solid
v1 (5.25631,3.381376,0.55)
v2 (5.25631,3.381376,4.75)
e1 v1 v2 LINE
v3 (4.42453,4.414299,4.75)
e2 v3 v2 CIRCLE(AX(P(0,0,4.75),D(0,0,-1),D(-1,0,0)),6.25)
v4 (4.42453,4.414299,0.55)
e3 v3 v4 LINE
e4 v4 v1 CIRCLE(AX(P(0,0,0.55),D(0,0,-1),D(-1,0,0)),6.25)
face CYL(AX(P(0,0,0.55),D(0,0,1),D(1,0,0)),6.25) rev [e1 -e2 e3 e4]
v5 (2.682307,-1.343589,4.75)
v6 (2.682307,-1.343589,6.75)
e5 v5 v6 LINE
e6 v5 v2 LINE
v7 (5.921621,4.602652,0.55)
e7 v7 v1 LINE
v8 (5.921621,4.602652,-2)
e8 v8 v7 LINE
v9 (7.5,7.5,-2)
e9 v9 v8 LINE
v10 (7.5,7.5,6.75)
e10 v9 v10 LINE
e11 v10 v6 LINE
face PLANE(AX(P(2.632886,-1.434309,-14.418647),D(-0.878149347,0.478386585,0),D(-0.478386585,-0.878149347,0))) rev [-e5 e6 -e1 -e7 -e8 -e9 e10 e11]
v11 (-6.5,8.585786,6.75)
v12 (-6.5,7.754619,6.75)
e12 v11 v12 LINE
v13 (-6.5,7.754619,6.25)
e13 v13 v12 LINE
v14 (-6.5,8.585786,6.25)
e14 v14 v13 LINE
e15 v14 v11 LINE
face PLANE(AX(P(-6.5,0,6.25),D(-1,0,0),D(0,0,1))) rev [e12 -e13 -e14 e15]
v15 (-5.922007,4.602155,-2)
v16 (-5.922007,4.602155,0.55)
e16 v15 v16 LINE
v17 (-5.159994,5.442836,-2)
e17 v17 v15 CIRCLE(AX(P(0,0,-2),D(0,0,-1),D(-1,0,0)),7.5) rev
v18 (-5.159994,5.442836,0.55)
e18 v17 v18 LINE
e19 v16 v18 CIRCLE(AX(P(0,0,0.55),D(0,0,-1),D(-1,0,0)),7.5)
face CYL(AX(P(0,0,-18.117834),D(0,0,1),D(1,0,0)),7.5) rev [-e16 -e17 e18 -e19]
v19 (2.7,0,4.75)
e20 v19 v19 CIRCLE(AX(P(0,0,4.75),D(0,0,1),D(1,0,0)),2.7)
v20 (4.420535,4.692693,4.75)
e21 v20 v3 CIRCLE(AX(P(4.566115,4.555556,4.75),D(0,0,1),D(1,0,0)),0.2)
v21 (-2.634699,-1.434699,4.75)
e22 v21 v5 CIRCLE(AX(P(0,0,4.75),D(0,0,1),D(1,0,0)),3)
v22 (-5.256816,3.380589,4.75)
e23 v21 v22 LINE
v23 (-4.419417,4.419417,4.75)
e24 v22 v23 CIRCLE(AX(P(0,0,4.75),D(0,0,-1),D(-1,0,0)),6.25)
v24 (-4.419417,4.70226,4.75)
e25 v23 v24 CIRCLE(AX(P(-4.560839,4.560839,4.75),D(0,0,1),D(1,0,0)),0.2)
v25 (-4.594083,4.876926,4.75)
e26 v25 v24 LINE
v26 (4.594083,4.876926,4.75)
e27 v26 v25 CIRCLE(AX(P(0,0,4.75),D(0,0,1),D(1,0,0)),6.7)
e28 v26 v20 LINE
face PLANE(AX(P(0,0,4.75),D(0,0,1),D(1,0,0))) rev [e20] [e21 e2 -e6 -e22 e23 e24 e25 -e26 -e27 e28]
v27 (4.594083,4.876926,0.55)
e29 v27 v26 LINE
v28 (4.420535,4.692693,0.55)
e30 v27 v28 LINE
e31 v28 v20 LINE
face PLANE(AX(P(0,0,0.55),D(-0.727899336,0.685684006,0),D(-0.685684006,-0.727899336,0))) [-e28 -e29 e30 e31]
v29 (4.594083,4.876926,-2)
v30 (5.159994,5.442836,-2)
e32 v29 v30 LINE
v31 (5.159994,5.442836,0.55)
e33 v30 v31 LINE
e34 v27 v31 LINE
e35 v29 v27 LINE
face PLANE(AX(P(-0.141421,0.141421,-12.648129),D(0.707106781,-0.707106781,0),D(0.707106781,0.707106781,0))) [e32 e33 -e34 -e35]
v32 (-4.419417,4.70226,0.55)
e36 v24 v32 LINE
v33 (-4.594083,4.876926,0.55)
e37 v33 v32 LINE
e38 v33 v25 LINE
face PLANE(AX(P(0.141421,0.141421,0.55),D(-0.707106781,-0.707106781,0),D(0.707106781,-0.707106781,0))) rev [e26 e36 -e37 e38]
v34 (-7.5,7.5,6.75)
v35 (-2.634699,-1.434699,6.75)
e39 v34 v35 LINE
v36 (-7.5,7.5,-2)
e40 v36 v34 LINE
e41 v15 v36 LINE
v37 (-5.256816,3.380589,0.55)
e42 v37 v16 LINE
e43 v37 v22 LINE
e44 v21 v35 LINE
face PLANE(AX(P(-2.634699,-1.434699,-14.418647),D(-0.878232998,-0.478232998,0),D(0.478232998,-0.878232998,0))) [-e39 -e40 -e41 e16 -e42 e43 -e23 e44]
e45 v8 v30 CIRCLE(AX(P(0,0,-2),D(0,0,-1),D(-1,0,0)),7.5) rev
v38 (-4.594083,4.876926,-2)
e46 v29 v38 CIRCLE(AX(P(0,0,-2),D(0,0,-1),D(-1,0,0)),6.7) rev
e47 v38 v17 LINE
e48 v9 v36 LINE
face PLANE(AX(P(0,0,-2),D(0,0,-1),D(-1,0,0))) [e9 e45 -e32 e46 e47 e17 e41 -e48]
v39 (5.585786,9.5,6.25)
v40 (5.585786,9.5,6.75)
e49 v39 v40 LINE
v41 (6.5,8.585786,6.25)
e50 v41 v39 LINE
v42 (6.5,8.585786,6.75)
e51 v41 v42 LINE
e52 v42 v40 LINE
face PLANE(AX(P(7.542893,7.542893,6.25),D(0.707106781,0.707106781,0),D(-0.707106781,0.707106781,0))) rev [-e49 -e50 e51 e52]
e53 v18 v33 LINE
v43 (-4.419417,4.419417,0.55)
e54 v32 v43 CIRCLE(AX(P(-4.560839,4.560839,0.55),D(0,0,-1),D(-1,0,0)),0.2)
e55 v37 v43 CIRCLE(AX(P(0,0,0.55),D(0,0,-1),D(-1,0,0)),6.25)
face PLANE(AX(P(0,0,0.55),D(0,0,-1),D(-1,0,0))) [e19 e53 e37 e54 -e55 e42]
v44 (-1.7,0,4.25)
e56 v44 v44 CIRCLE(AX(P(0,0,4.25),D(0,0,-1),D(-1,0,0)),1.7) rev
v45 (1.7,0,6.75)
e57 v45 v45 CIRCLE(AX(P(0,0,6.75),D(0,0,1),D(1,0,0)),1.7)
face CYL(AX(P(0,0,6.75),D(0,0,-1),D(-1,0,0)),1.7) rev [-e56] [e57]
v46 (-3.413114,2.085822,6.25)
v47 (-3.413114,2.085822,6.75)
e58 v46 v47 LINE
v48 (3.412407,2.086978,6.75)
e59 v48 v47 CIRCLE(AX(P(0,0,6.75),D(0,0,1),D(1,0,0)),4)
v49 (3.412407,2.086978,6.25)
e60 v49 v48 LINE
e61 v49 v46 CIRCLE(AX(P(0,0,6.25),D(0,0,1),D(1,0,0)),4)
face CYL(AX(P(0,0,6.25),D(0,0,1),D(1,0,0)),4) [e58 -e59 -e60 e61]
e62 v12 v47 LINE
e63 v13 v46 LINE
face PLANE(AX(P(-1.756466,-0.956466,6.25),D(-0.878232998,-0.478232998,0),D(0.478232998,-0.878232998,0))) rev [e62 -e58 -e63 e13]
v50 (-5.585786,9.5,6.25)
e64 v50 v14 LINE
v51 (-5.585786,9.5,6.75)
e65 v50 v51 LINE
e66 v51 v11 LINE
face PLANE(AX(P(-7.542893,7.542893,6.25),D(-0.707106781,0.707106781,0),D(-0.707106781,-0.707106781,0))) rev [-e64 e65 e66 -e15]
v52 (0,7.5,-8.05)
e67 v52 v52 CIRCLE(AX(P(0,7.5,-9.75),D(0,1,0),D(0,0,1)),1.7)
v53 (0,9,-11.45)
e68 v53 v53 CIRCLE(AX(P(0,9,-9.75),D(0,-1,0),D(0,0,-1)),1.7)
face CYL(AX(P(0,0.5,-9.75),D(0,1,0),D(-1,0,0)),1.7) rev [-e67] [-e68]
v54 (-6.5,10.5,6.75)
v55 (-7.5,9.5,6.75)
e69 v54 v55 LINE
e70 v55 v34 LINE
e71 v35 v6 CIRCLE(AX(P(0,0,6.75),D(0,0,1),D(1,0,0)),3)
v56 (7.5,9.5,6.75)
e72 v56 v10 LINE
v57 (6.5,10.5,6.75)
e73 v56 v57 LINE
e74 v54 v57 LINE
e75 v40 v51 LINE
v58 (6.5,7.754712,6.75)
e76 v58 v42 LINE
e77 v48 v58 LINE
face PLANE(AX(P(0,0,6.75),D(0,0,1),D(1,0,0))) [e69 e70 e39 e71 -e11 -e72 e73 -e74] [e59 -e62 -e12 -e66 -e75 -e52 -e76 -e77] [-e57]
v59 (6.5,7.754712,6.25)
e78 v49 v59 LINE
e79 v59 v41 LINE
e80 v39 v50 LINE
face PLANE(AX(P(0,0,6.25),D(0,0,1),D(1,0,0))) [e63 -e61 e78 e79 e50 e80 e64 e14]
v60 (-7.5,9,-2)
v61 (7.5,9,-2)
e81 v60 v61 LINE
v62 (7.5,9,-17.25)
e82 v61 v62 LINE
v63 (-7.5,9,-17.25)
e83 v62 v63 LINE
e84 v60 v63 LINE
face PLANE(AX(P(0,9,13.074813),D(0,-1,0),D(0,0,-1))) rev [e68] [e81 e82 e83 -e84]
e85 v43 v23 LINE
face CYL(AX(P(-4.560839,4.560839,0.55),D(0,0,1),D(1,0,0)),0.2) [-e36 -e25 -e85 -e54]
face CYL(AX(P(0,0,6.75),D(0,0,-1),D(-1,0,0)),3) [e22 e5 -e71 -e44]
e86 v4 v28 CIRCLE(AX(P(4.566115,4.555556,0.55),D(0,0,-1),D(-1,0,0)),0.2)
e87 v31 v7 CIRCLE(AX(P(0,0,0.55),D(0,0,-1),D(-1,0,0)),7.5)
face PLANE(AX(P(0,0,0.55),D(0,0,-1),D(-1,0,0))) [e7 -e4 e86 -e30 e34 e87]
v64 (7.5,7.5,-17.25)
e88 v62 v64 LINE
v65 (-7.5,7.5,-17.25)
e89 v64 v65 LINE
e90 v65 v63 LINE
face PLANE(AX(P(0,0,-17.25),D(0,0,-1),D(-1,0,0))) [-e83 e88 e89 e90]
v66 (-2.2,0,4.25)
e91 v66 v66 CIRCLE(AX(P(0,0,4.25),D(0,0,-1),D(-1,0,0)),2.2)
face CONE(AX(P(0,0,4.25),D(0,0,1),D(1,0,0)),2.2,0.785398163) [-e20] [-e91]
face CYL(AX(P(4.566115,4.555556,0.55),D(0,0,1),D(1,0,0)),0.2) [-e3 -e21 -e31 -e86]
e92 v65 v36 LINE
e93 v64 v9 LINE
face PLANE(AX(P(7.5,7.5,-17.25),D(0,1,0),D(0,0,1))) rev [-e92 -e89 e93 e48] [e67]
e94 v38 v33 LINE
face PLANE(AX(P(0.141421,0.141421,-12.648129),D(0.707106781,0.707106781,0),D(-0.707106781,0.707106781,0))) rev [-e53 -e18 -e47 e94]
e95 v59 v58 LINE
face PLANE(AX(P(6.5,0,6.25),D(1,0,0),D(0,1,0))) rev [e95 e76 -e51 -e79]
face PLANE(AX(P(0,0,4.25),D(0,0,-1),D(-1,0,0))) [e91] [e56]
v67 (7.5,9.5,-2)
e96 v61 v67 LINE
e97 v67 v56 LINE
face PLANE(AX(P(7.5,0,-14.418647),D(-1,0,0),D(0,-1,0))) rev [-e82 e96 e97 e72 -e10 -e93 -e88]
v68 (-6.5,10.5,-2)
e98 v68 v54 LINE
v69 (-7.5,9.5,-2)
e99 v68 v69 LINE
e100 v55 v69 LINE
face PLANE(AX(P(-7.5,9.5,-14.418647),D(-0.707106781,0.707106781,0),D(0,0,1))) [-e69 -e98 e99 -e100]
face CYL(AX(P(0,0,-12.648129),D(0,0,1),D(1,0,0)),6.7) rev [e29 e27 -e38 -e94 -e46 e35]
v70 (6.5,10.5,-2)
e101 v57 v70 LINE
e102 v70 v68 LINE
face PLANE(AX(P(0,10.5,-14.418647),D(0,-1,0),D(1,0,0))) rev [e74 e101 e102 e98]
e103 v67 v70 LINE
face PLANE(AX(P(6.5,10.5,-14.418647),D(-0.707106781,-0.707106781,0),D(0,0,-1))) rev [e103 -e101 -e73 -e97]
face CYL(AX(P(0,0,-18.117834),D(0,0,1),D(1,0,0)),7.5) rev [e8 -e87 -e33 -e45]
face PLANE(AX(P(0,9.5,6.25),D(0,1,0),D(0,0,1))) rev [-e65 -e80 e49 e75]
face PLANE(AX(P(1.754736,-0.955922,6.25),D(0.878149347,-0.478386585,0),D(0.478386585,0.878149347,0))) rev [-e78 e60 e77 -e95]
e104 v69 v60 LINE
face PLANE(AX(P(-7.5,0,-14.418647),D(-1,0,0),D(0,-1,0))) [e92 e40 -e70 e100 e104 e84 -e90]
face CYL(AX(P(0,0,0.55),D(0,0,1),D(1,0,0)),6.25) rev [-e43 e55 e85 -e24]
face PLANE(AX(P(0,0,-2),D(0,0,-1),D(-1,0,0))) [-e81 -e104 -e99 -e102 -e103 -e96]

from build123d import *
from build123d.topology import SkipClean

# Parameters (mm, degrees)
BOSS_EXTRUDE1_DEPTH    = 2
BOSS_EXTRUDE2_START    = 4.75
BOSS_EXTRUDE2_DEPTH    = 4.75
BOSS_EXTRUDE3_START    = 2
SKETCH3_R              = 3
SKETCH3_R_2            = 1.7
BOSS_EXTRUDE3_DEPTH    = 2
SKETCH4_R              = 2.2
SKETCH4_R_2            = 1.7
BOSS_EXTRUDE4_DEPTH    = 0.5
CHAMFER1_SIZE          = 0.5
SKETCH5_W              = 7.5
SKETCH5_H              = 3
BOSS_EXTRUDE5_DEPTH    = 2
BOSS_EXTRUDE6_DEPTH    = 4.2
BOSS_EXTRUDE8_DEPTH    = 6.75
SKETCH10_W             = 15
SKETCH10_H             = 3
BOSS_EXTRUDE9_DEPTH    = 15.25
SKETCH11_R             = 1.65
CUT_EXTRUDE1_DEPTH     = 22.542109925
FILLET1_R              = 0.2
BOSS_EXTRUDE12_REACH   = 29.249
SKETCH16_W             = 15
SKETCH16_H             = 1.5
CUT_EXTRUDE3_DEPTH     = 0.5
CUT_EXTRUDE4_START     = -15.25
CUT_EXTRUDE4_OUTLINE_W = 15
CUT_EXTRUDE4_OUTLINE_H = 1.5
CUT_EXTRUDE4_DEPTH     = 15.25
CUT_EXTRUDE4_START_2   = -24
CUT_EXTRUDE4_2_DEPTH   = 8.75
SKETCH18_R             = 1.7
CUT_EXTRUDE5_DEPTH     = 10


# Read off the part's stored shape, not the designer's step: Cut-Extrude4
with BuildPart() as part:
    # Sketch1 → Boss-Extrude1 (new body)
    with BuildSketch(Plane.XY):
        with BuildLine():
            Line((4.594082841, 4.876925553), (5.159993549, 5.442836262))
            ThreePointArc((5.159993549, 5.442836262), (0, 7.5), (-5.159993549, 5.442836262))
            Line((-5.159993549, 5.442836262), (-4.594082841, 4.876925553))
            ThreePointArc((-4.594082841, 4.876925553), (0, 6.7), (4.594082841, 4.876925553))
        make_face()
    extrude(amount=-BOSS_EXTRUDE1_DEPTH)

    # Sketch1<3> → Boss-Extrude2 (add)
    with BuildSketch(Plane.XY.offset(BOSS_EXTRUDE2_START)):
        with BuildLine():
            Line((4.594082841, 4.876925553), (5.159993549, 5.442836262))
            ThreePointArc((5.159993549, 5.442836262), (0, 7.5), (-5.159993549, 5.442836262))
            Line((-5.159993549, 5.442836262), (-4.594082841, 4.876925553))
            ThreePointArc((-4.594082841, 4.876925553), (0, 6.7), (4.594082841, 4.876925553))
        make_face()
    extrude(amount=-BOSS_EXTRUDE2_DEPTH)

    # Sketch3 → Boss-Extrude3 (add)
    # profile 1 of 4: a face of its own
    with BuildSketch(Plane.XY.offset(4.75).offset(BOSS_EXTRUDE3_START)):
        with BuildLine():
            Line((-4.594082841, 4.876925553), (-5.159993549, 5.442836262))
            Line((-5.159993549, 5.442836262), (-2.820975701, -1.02083108))
            ThreePointArc((-2.820975701, -1.02083108), (-2.892694114, 0.795185994), (-1.902774006, 2.31936437))
            Line((-1.902774006, 2.31936437), (-2.780654635, 4.745309242))
            ThreePointArc((-2.780654635, 4.745309242), (0, 5.5), (2.780654635, 4.745309242))
            Line((2.780654635, 4.745309242), (1.902774006, 2.31936437))
            ThreePointArc((1.902774006, 2.31936437), (2.711855639, 1.282902565), (3, 0))
            ThreePointArc((3, 0), (2.954904999, -0.518205025), (2.820975701, -1.02083108))
            Line((2.820975701, -1.02083108), (5.159993549, 5.442836262))
            Line((5.159993549, 5.442836262), (4.594082841, 4.876925553))
            ThreePointArc((4.594082841, 4.876925553), (0, 6.7), (-4.594082841, 4.876925553))
        make_face()
    # profile 2 of 4: a face of its own
    with BuildSketch(Plane.XY.offset(4.75).offset(BOSS_EXTRUDE3_START)):
        with BuildLine():
            Line((-5.159993549, 5.442836262), (-4.594082841, 4.876925553))
            ThreePointArc((-4.594082841, 4.876925553), (0, 6.7), (4.594082841, 4.876925553))
            Line((4.594082841, 4.876925553), (5.159993549, 5.442836262))
            ThreePointArc((5.159993549, 5.442836262), (0, 7.5), (-5.159993549, 5.442836262))
        make_face()
    # profile 3 of 4: a face of its own
    with BuildSketch(Plane.XY.offset(4.75).offset(BOSS_EXTRUDE3_START)):
        Circle(SKETCH3_R)
        Circle(SKETCH3_R_2, mode=Mode.SUBTRACT)
    # profile 4 of 4: a face of its own
    with BuildSketch(Plane.XY.offset(4.75).offset(BOSS_EXTRUDE3_START)):
        with BuildLine():
            Line((-2.780654635, 4.745309242), (-1.902774006, 2.31936437))
            ThreePointArc((-1.902774006, 2.31936437), (0, 3), (1.902774006, 2.31936437))
            Line((1.902774006, 2.31936437), (2.780654635, 4.745309242))
            ThreePointArc((2.780654635, 4.745309242), (0, 5.5), (-2.780654635, 4.745309242))
        make_face()
    extrude(amount=-BOSS_EXTRUDE3_DEPTH)

    # Sketch4 → Boss-Extrude4 (add)
    with SkipClean():  # the faces are left unmerged after this step: merging them gives an invalid solid
        with BuildSketch(Plane(origin=(0, 0, 4.75), x_dir=(-1, 0, 0), z_dir=(0, 0, -1))):
            with Locations(Location((0, 0, 0), (0, 0, 180))):
                Circle(SKETCH4_R)
            Circle(SKETCH4_R_2, mode=Mode.SUBTRACT)
        extrude(amount=BOSS_EXTRUDE4_DEPTH)
    add(part.part.scale(1), mode=Mode.REPLACE)  # the faces are merged on a copy

    # Chamfer1
    chamfer1_edges = [part.edges().sort_by_distance(p)[0] for p in [
        (-2.2, 0, 4.75),
    ]]
    chamfer(chamfer1_edges, length=CHAMFER1_SIZE - 0.0001)  # a hair under: the kernel refuses the full size

    # Sketch5 → Boss-Extrude5 (add)
    with BuildSketch(Plane.XY.offset(6.75)):
        with BuildLine():
            ThreePointArc((-5.159993549, 5.442836262), (-2.777474396, 6.966752183), (0, 7.5))
            Line((0, 7.5), (-7.5, 7.5))
            Line((-7.5, 7.5), (-2.634698995, -1.434698995))
            ThreePointArc((-2.634698995, -1.434698995), (-2.735675101, -1.231292711), (-2.820975701, -1.02083108))
            Line((-2.820975701, -1.02083108), (-5.159993549, 5.442836262))
        make_face()
        with Locations((-3.75, 9)):
            Rectangle(SKETCH5_W, SKETCH5_H)
        with Locations((3.75, 9)):
            Rectangle(SKETCH5_W, SKETCH5_H)
        with BuildLine():
            Line((7.5, 7.5), (0, 7.5))
            ThreePointArc((0, 7.5), (2.777474396, 6.966752183), (5.159993549, 5.442836262))
            Line((5.159993549, 5.442836262), (2.820975701, -1.02083108))
            ThreePointArc((2.820975701, -1.02083108), (2.756369418, -1.184241374), (2.682306676, -1.343588812))
            Line((2.682306676, -1.343588812), (7.5, 7.5))
        make_face()
    extrude(amount=-BOSS_EXTRUDE5_DEPTH)

    # Sketch6 → Boss-Extrude6 (add)
    with SkipClean():  # the faces are left unmerged after this step: merging them gives an invalid solid
        with BuildSketch(Plane(origin=(0, 0, 4.75), x_dir=(-1, 0, 0), z_dir=(0, 0, -1))):
            with BuildLine():
                Line((-5.921621025, 4.602651891), (-5.499242594, 3.827313795))
                ThreePointArc((-5.499242594, 3.827313795), (-5.073876801, 4.375588441), (-4.594082841, 4.876925553))
                Line((-4.594082841, 4.876925553), (-5.159993549, 5.442836262))
                ThreePointArc((-5.159993549, 5.442836262), (-5.556709713, 5.037159632), (-5.921621025, 4.602651891))
            make_face()
            with BuildLine():
                Line((5.159993549, 5.442836262), (4.594082841, 4.876925553))
                ThreePointArc((4.594082841, 4.876925553), (5.074143899, 4.375278699), (5.499709828, 3.826642367))
                Line((5.499709828, 3.826642367), (5.922007367, 4.602154794))
                ThreePointArc((5.922007367, 4.602154794), (5.556921127, 5.036926403), (5.159993549, 5.442836262))
            make_face()
            with BuildLine():
                Line((-5.499242594, 3.827313795), (-5.256310338, 3.381375701))
                ThreePointArc((-5.256310338, 3.381375701), (-4.806527723, 3.994970744), (-4.285525038, 4.549370852))
                Line((-4.285525038, 4.549370852), (-4.594082841, 4.876925553))
                ThreePointArc((-4.594082841, 4.876925553), (-5.073876801, 4.375588441), (-5.499242594, 3.827313795))
            make_face()
            with BuildLine():
                Line((4.594082841, 4.876925553), (4.275732705, 4.558575417))
                ThreePointArc((4.275732705, 4.558575417), (4.802528974, 3.999776925), (5.256816116, 3.380589346))
                Line((5.256816116, 3.380589346), (5.499709828, 3.826642367))
                ThreePointArc((5.499709828, 3.826642367), (5.074143899, 4.375278699), (4.594082841, 4.876925553))
            make_face()
        extrude(amount=BOSS_EXTRUDE6_DEPTH)

    # Sketch8 → Boss-Extrude8 (add)
    with BuildSketch(Plane(origin=(0, 0, 4.75), x_dir=(-1, 0, 0), z_dir=(0, 0, -1))):
        with BuildLine():
            Line((5.922007367, 4.602154794), (7.5, 7.5))
            Line((7.5, 7.5), (7.5, 10.5))
            Line((7.5, 10.5), (-7.5, 10.5))
            Line((-7.5, 10.5), (-7.5, 7.5))
            Line((-7.5, 7.5), (-5.921621025, 4.602651891))
            ThreePointArc((-5.921621025, 4.602651891), (0.000314788, 7.499999993), (5.922007367, 4.602154794))
        make_face()
    extrude(amount=BOSS_EXTRUDE8_DEPTH)

    # Sketch10 → Boss-Extrude9 (add)
    with BuildSketch(Plane(origin=(0, 0, -2), x_dir=(-1, 0, 0), z_dir=(0, 0, -1))):
        with Locations((0, 9)):
            Rectangle(SKETCH10_W, SKETCH10_H)
    extrude(amount=BOSS_EXTRUDE9_DEPTH)

    # Sketch11 → Cut-Extrude1 (cut, through all)
    with BuildSketch(Plane.XZ.offset(-7.5)):
        with Locations(Location((0, -9.75, 0), (0, 0, 270))):
            Circle(SKETCH11_R)
    extrude(amount=-CUT_EXTRUDE1_DEPTH, mode=Mode.SUBTRACT)

    # Fillet1
    fillet1_edges = [part.edges().sort_by_distance(p)[0] for p in [
        (4.285525038, 4.549370852, 2.65),
        (-4.275732705, 4.558575417, 2.65),
    ]]
    fillet(fillet1_edges, radius=FILLET1_R)

    # Boss-Extrude12: up to this face of the body (flat: up to its plane)
    boss_extrude12_end = Plane(part.part.faces().sort_by_distance((-0.000288638, 5.532557353, 6.75))[0])
    # Sketch16 → Boss-Extrude12 (add, up to the picked face)
    with BuildSketch(Plane(origin=(0, 0, -17.25), x_dir=(-1, 0, 0), z_dir=(0, 0, -1)), mode=Mode.PRIVATE) as boss_extrude12_sk1:
        with Locations((0, 9.75)):
            Rectangle(SKETCH16_W, SKETCH16_H)
    boss_extrude12_tool1 = split(extrude(boss_extrude12_sk1.sketch, amount=-BOSS_EXTRUDE12_REACH, mode=Mode.PRIVATE), bisect_by=boss_extrude12_end, keep=Keep.BOTH, mode=Mode.PRIVATE)
    add(boss_extrude12_tool1.solids().sort_by(Axis((0, 9.75, -17.25), (0, 0, 1)))[0])

    # Sketch13 → Cut-Extrude3 (cut)
    with BuildSketch(Plane.XY.offset(6.75)):
        with BuildLine():
            ThreePointArc((3.4124071, 2.086978147), (-0.000677338, 3.999999943), (-3.413113698, 2.085822351))
            Line((-3.413113698, 2.085822351), (-6.5, 7.754618569))
            Line((-6.5, 7.754618569), (-6.5, 8.585786438))
            Line((-6.5, 8.585786438), (-5.585786438, 9.5))
            Line((-5.585786438, 9.5), (5.585786438, 9.5))
            Line((5.585786438, 9.5), (6.5, 8.585786438))
            Line((6.5, 8.585786438), (6.5, 7.754711685))
            Line((6.5, 7.754711685), (3.4124071, 2.086978147))
        make_face()
    extrude(amount=-CUT_EXTRUDE3_DEPTH, mode=Mode.SUBTRACT)

    # Cut-Extrude4 outline → Cut-Extrude4 (cut)
    with BuildSketch(Plane(origin=(0, 0, -17.25), x_dir=(-1, 0, 0), z_dir=(0, 0, -1)).offset(CUT_EXTRUDE4_START)):
        with Locations((0, 9.75)):
            Rectangle(CUT_EXTRUDE4_OUTLINE_W, CUT_EXTRUDE4_OUTLINE_H)
    extrude(amount=CUT_EXTRUDE4_DEPTH, mode=Mode.SUBTRACT)

    # Cut-Extrude4 2 outline → Cut-Extrude4 2 (cut)
    with BuildSketch(Plane(origin=(0, 0, -17.25), x_dir=(-1, 0, 0), z_dir=(0, 0, -1)).offset(CUT_EXTRUDE4_START_2)):
        Polygon((-7.5, 10.5), (-7.5, 9.5), (-6.5, 10.5), align=None)
        Polygon((7.5, 10.5), (6.5, 10.5), (7.5, 9.5), align=None)
    extrude(amount=CUT_EXTRUDE4_2_DEPTH, mode=Mode.SUBTRACT)

    # Sketch18 → Cut-Extrude5 (cut)
    with BuildSketch(Plane(origin=(0, 10.5, 0), x_dir=(1, 0, 0), z_dir=(0, 1, 0))):
        with Locations(Location((0, 9.75, 0), (0, 0, 90))):
            Circle(SKETCH18_R)
    extrude(amount=-CUT_EXTRUDE5_DEPTH, mode=Mode.SUBTRACT)


solid = part.part
